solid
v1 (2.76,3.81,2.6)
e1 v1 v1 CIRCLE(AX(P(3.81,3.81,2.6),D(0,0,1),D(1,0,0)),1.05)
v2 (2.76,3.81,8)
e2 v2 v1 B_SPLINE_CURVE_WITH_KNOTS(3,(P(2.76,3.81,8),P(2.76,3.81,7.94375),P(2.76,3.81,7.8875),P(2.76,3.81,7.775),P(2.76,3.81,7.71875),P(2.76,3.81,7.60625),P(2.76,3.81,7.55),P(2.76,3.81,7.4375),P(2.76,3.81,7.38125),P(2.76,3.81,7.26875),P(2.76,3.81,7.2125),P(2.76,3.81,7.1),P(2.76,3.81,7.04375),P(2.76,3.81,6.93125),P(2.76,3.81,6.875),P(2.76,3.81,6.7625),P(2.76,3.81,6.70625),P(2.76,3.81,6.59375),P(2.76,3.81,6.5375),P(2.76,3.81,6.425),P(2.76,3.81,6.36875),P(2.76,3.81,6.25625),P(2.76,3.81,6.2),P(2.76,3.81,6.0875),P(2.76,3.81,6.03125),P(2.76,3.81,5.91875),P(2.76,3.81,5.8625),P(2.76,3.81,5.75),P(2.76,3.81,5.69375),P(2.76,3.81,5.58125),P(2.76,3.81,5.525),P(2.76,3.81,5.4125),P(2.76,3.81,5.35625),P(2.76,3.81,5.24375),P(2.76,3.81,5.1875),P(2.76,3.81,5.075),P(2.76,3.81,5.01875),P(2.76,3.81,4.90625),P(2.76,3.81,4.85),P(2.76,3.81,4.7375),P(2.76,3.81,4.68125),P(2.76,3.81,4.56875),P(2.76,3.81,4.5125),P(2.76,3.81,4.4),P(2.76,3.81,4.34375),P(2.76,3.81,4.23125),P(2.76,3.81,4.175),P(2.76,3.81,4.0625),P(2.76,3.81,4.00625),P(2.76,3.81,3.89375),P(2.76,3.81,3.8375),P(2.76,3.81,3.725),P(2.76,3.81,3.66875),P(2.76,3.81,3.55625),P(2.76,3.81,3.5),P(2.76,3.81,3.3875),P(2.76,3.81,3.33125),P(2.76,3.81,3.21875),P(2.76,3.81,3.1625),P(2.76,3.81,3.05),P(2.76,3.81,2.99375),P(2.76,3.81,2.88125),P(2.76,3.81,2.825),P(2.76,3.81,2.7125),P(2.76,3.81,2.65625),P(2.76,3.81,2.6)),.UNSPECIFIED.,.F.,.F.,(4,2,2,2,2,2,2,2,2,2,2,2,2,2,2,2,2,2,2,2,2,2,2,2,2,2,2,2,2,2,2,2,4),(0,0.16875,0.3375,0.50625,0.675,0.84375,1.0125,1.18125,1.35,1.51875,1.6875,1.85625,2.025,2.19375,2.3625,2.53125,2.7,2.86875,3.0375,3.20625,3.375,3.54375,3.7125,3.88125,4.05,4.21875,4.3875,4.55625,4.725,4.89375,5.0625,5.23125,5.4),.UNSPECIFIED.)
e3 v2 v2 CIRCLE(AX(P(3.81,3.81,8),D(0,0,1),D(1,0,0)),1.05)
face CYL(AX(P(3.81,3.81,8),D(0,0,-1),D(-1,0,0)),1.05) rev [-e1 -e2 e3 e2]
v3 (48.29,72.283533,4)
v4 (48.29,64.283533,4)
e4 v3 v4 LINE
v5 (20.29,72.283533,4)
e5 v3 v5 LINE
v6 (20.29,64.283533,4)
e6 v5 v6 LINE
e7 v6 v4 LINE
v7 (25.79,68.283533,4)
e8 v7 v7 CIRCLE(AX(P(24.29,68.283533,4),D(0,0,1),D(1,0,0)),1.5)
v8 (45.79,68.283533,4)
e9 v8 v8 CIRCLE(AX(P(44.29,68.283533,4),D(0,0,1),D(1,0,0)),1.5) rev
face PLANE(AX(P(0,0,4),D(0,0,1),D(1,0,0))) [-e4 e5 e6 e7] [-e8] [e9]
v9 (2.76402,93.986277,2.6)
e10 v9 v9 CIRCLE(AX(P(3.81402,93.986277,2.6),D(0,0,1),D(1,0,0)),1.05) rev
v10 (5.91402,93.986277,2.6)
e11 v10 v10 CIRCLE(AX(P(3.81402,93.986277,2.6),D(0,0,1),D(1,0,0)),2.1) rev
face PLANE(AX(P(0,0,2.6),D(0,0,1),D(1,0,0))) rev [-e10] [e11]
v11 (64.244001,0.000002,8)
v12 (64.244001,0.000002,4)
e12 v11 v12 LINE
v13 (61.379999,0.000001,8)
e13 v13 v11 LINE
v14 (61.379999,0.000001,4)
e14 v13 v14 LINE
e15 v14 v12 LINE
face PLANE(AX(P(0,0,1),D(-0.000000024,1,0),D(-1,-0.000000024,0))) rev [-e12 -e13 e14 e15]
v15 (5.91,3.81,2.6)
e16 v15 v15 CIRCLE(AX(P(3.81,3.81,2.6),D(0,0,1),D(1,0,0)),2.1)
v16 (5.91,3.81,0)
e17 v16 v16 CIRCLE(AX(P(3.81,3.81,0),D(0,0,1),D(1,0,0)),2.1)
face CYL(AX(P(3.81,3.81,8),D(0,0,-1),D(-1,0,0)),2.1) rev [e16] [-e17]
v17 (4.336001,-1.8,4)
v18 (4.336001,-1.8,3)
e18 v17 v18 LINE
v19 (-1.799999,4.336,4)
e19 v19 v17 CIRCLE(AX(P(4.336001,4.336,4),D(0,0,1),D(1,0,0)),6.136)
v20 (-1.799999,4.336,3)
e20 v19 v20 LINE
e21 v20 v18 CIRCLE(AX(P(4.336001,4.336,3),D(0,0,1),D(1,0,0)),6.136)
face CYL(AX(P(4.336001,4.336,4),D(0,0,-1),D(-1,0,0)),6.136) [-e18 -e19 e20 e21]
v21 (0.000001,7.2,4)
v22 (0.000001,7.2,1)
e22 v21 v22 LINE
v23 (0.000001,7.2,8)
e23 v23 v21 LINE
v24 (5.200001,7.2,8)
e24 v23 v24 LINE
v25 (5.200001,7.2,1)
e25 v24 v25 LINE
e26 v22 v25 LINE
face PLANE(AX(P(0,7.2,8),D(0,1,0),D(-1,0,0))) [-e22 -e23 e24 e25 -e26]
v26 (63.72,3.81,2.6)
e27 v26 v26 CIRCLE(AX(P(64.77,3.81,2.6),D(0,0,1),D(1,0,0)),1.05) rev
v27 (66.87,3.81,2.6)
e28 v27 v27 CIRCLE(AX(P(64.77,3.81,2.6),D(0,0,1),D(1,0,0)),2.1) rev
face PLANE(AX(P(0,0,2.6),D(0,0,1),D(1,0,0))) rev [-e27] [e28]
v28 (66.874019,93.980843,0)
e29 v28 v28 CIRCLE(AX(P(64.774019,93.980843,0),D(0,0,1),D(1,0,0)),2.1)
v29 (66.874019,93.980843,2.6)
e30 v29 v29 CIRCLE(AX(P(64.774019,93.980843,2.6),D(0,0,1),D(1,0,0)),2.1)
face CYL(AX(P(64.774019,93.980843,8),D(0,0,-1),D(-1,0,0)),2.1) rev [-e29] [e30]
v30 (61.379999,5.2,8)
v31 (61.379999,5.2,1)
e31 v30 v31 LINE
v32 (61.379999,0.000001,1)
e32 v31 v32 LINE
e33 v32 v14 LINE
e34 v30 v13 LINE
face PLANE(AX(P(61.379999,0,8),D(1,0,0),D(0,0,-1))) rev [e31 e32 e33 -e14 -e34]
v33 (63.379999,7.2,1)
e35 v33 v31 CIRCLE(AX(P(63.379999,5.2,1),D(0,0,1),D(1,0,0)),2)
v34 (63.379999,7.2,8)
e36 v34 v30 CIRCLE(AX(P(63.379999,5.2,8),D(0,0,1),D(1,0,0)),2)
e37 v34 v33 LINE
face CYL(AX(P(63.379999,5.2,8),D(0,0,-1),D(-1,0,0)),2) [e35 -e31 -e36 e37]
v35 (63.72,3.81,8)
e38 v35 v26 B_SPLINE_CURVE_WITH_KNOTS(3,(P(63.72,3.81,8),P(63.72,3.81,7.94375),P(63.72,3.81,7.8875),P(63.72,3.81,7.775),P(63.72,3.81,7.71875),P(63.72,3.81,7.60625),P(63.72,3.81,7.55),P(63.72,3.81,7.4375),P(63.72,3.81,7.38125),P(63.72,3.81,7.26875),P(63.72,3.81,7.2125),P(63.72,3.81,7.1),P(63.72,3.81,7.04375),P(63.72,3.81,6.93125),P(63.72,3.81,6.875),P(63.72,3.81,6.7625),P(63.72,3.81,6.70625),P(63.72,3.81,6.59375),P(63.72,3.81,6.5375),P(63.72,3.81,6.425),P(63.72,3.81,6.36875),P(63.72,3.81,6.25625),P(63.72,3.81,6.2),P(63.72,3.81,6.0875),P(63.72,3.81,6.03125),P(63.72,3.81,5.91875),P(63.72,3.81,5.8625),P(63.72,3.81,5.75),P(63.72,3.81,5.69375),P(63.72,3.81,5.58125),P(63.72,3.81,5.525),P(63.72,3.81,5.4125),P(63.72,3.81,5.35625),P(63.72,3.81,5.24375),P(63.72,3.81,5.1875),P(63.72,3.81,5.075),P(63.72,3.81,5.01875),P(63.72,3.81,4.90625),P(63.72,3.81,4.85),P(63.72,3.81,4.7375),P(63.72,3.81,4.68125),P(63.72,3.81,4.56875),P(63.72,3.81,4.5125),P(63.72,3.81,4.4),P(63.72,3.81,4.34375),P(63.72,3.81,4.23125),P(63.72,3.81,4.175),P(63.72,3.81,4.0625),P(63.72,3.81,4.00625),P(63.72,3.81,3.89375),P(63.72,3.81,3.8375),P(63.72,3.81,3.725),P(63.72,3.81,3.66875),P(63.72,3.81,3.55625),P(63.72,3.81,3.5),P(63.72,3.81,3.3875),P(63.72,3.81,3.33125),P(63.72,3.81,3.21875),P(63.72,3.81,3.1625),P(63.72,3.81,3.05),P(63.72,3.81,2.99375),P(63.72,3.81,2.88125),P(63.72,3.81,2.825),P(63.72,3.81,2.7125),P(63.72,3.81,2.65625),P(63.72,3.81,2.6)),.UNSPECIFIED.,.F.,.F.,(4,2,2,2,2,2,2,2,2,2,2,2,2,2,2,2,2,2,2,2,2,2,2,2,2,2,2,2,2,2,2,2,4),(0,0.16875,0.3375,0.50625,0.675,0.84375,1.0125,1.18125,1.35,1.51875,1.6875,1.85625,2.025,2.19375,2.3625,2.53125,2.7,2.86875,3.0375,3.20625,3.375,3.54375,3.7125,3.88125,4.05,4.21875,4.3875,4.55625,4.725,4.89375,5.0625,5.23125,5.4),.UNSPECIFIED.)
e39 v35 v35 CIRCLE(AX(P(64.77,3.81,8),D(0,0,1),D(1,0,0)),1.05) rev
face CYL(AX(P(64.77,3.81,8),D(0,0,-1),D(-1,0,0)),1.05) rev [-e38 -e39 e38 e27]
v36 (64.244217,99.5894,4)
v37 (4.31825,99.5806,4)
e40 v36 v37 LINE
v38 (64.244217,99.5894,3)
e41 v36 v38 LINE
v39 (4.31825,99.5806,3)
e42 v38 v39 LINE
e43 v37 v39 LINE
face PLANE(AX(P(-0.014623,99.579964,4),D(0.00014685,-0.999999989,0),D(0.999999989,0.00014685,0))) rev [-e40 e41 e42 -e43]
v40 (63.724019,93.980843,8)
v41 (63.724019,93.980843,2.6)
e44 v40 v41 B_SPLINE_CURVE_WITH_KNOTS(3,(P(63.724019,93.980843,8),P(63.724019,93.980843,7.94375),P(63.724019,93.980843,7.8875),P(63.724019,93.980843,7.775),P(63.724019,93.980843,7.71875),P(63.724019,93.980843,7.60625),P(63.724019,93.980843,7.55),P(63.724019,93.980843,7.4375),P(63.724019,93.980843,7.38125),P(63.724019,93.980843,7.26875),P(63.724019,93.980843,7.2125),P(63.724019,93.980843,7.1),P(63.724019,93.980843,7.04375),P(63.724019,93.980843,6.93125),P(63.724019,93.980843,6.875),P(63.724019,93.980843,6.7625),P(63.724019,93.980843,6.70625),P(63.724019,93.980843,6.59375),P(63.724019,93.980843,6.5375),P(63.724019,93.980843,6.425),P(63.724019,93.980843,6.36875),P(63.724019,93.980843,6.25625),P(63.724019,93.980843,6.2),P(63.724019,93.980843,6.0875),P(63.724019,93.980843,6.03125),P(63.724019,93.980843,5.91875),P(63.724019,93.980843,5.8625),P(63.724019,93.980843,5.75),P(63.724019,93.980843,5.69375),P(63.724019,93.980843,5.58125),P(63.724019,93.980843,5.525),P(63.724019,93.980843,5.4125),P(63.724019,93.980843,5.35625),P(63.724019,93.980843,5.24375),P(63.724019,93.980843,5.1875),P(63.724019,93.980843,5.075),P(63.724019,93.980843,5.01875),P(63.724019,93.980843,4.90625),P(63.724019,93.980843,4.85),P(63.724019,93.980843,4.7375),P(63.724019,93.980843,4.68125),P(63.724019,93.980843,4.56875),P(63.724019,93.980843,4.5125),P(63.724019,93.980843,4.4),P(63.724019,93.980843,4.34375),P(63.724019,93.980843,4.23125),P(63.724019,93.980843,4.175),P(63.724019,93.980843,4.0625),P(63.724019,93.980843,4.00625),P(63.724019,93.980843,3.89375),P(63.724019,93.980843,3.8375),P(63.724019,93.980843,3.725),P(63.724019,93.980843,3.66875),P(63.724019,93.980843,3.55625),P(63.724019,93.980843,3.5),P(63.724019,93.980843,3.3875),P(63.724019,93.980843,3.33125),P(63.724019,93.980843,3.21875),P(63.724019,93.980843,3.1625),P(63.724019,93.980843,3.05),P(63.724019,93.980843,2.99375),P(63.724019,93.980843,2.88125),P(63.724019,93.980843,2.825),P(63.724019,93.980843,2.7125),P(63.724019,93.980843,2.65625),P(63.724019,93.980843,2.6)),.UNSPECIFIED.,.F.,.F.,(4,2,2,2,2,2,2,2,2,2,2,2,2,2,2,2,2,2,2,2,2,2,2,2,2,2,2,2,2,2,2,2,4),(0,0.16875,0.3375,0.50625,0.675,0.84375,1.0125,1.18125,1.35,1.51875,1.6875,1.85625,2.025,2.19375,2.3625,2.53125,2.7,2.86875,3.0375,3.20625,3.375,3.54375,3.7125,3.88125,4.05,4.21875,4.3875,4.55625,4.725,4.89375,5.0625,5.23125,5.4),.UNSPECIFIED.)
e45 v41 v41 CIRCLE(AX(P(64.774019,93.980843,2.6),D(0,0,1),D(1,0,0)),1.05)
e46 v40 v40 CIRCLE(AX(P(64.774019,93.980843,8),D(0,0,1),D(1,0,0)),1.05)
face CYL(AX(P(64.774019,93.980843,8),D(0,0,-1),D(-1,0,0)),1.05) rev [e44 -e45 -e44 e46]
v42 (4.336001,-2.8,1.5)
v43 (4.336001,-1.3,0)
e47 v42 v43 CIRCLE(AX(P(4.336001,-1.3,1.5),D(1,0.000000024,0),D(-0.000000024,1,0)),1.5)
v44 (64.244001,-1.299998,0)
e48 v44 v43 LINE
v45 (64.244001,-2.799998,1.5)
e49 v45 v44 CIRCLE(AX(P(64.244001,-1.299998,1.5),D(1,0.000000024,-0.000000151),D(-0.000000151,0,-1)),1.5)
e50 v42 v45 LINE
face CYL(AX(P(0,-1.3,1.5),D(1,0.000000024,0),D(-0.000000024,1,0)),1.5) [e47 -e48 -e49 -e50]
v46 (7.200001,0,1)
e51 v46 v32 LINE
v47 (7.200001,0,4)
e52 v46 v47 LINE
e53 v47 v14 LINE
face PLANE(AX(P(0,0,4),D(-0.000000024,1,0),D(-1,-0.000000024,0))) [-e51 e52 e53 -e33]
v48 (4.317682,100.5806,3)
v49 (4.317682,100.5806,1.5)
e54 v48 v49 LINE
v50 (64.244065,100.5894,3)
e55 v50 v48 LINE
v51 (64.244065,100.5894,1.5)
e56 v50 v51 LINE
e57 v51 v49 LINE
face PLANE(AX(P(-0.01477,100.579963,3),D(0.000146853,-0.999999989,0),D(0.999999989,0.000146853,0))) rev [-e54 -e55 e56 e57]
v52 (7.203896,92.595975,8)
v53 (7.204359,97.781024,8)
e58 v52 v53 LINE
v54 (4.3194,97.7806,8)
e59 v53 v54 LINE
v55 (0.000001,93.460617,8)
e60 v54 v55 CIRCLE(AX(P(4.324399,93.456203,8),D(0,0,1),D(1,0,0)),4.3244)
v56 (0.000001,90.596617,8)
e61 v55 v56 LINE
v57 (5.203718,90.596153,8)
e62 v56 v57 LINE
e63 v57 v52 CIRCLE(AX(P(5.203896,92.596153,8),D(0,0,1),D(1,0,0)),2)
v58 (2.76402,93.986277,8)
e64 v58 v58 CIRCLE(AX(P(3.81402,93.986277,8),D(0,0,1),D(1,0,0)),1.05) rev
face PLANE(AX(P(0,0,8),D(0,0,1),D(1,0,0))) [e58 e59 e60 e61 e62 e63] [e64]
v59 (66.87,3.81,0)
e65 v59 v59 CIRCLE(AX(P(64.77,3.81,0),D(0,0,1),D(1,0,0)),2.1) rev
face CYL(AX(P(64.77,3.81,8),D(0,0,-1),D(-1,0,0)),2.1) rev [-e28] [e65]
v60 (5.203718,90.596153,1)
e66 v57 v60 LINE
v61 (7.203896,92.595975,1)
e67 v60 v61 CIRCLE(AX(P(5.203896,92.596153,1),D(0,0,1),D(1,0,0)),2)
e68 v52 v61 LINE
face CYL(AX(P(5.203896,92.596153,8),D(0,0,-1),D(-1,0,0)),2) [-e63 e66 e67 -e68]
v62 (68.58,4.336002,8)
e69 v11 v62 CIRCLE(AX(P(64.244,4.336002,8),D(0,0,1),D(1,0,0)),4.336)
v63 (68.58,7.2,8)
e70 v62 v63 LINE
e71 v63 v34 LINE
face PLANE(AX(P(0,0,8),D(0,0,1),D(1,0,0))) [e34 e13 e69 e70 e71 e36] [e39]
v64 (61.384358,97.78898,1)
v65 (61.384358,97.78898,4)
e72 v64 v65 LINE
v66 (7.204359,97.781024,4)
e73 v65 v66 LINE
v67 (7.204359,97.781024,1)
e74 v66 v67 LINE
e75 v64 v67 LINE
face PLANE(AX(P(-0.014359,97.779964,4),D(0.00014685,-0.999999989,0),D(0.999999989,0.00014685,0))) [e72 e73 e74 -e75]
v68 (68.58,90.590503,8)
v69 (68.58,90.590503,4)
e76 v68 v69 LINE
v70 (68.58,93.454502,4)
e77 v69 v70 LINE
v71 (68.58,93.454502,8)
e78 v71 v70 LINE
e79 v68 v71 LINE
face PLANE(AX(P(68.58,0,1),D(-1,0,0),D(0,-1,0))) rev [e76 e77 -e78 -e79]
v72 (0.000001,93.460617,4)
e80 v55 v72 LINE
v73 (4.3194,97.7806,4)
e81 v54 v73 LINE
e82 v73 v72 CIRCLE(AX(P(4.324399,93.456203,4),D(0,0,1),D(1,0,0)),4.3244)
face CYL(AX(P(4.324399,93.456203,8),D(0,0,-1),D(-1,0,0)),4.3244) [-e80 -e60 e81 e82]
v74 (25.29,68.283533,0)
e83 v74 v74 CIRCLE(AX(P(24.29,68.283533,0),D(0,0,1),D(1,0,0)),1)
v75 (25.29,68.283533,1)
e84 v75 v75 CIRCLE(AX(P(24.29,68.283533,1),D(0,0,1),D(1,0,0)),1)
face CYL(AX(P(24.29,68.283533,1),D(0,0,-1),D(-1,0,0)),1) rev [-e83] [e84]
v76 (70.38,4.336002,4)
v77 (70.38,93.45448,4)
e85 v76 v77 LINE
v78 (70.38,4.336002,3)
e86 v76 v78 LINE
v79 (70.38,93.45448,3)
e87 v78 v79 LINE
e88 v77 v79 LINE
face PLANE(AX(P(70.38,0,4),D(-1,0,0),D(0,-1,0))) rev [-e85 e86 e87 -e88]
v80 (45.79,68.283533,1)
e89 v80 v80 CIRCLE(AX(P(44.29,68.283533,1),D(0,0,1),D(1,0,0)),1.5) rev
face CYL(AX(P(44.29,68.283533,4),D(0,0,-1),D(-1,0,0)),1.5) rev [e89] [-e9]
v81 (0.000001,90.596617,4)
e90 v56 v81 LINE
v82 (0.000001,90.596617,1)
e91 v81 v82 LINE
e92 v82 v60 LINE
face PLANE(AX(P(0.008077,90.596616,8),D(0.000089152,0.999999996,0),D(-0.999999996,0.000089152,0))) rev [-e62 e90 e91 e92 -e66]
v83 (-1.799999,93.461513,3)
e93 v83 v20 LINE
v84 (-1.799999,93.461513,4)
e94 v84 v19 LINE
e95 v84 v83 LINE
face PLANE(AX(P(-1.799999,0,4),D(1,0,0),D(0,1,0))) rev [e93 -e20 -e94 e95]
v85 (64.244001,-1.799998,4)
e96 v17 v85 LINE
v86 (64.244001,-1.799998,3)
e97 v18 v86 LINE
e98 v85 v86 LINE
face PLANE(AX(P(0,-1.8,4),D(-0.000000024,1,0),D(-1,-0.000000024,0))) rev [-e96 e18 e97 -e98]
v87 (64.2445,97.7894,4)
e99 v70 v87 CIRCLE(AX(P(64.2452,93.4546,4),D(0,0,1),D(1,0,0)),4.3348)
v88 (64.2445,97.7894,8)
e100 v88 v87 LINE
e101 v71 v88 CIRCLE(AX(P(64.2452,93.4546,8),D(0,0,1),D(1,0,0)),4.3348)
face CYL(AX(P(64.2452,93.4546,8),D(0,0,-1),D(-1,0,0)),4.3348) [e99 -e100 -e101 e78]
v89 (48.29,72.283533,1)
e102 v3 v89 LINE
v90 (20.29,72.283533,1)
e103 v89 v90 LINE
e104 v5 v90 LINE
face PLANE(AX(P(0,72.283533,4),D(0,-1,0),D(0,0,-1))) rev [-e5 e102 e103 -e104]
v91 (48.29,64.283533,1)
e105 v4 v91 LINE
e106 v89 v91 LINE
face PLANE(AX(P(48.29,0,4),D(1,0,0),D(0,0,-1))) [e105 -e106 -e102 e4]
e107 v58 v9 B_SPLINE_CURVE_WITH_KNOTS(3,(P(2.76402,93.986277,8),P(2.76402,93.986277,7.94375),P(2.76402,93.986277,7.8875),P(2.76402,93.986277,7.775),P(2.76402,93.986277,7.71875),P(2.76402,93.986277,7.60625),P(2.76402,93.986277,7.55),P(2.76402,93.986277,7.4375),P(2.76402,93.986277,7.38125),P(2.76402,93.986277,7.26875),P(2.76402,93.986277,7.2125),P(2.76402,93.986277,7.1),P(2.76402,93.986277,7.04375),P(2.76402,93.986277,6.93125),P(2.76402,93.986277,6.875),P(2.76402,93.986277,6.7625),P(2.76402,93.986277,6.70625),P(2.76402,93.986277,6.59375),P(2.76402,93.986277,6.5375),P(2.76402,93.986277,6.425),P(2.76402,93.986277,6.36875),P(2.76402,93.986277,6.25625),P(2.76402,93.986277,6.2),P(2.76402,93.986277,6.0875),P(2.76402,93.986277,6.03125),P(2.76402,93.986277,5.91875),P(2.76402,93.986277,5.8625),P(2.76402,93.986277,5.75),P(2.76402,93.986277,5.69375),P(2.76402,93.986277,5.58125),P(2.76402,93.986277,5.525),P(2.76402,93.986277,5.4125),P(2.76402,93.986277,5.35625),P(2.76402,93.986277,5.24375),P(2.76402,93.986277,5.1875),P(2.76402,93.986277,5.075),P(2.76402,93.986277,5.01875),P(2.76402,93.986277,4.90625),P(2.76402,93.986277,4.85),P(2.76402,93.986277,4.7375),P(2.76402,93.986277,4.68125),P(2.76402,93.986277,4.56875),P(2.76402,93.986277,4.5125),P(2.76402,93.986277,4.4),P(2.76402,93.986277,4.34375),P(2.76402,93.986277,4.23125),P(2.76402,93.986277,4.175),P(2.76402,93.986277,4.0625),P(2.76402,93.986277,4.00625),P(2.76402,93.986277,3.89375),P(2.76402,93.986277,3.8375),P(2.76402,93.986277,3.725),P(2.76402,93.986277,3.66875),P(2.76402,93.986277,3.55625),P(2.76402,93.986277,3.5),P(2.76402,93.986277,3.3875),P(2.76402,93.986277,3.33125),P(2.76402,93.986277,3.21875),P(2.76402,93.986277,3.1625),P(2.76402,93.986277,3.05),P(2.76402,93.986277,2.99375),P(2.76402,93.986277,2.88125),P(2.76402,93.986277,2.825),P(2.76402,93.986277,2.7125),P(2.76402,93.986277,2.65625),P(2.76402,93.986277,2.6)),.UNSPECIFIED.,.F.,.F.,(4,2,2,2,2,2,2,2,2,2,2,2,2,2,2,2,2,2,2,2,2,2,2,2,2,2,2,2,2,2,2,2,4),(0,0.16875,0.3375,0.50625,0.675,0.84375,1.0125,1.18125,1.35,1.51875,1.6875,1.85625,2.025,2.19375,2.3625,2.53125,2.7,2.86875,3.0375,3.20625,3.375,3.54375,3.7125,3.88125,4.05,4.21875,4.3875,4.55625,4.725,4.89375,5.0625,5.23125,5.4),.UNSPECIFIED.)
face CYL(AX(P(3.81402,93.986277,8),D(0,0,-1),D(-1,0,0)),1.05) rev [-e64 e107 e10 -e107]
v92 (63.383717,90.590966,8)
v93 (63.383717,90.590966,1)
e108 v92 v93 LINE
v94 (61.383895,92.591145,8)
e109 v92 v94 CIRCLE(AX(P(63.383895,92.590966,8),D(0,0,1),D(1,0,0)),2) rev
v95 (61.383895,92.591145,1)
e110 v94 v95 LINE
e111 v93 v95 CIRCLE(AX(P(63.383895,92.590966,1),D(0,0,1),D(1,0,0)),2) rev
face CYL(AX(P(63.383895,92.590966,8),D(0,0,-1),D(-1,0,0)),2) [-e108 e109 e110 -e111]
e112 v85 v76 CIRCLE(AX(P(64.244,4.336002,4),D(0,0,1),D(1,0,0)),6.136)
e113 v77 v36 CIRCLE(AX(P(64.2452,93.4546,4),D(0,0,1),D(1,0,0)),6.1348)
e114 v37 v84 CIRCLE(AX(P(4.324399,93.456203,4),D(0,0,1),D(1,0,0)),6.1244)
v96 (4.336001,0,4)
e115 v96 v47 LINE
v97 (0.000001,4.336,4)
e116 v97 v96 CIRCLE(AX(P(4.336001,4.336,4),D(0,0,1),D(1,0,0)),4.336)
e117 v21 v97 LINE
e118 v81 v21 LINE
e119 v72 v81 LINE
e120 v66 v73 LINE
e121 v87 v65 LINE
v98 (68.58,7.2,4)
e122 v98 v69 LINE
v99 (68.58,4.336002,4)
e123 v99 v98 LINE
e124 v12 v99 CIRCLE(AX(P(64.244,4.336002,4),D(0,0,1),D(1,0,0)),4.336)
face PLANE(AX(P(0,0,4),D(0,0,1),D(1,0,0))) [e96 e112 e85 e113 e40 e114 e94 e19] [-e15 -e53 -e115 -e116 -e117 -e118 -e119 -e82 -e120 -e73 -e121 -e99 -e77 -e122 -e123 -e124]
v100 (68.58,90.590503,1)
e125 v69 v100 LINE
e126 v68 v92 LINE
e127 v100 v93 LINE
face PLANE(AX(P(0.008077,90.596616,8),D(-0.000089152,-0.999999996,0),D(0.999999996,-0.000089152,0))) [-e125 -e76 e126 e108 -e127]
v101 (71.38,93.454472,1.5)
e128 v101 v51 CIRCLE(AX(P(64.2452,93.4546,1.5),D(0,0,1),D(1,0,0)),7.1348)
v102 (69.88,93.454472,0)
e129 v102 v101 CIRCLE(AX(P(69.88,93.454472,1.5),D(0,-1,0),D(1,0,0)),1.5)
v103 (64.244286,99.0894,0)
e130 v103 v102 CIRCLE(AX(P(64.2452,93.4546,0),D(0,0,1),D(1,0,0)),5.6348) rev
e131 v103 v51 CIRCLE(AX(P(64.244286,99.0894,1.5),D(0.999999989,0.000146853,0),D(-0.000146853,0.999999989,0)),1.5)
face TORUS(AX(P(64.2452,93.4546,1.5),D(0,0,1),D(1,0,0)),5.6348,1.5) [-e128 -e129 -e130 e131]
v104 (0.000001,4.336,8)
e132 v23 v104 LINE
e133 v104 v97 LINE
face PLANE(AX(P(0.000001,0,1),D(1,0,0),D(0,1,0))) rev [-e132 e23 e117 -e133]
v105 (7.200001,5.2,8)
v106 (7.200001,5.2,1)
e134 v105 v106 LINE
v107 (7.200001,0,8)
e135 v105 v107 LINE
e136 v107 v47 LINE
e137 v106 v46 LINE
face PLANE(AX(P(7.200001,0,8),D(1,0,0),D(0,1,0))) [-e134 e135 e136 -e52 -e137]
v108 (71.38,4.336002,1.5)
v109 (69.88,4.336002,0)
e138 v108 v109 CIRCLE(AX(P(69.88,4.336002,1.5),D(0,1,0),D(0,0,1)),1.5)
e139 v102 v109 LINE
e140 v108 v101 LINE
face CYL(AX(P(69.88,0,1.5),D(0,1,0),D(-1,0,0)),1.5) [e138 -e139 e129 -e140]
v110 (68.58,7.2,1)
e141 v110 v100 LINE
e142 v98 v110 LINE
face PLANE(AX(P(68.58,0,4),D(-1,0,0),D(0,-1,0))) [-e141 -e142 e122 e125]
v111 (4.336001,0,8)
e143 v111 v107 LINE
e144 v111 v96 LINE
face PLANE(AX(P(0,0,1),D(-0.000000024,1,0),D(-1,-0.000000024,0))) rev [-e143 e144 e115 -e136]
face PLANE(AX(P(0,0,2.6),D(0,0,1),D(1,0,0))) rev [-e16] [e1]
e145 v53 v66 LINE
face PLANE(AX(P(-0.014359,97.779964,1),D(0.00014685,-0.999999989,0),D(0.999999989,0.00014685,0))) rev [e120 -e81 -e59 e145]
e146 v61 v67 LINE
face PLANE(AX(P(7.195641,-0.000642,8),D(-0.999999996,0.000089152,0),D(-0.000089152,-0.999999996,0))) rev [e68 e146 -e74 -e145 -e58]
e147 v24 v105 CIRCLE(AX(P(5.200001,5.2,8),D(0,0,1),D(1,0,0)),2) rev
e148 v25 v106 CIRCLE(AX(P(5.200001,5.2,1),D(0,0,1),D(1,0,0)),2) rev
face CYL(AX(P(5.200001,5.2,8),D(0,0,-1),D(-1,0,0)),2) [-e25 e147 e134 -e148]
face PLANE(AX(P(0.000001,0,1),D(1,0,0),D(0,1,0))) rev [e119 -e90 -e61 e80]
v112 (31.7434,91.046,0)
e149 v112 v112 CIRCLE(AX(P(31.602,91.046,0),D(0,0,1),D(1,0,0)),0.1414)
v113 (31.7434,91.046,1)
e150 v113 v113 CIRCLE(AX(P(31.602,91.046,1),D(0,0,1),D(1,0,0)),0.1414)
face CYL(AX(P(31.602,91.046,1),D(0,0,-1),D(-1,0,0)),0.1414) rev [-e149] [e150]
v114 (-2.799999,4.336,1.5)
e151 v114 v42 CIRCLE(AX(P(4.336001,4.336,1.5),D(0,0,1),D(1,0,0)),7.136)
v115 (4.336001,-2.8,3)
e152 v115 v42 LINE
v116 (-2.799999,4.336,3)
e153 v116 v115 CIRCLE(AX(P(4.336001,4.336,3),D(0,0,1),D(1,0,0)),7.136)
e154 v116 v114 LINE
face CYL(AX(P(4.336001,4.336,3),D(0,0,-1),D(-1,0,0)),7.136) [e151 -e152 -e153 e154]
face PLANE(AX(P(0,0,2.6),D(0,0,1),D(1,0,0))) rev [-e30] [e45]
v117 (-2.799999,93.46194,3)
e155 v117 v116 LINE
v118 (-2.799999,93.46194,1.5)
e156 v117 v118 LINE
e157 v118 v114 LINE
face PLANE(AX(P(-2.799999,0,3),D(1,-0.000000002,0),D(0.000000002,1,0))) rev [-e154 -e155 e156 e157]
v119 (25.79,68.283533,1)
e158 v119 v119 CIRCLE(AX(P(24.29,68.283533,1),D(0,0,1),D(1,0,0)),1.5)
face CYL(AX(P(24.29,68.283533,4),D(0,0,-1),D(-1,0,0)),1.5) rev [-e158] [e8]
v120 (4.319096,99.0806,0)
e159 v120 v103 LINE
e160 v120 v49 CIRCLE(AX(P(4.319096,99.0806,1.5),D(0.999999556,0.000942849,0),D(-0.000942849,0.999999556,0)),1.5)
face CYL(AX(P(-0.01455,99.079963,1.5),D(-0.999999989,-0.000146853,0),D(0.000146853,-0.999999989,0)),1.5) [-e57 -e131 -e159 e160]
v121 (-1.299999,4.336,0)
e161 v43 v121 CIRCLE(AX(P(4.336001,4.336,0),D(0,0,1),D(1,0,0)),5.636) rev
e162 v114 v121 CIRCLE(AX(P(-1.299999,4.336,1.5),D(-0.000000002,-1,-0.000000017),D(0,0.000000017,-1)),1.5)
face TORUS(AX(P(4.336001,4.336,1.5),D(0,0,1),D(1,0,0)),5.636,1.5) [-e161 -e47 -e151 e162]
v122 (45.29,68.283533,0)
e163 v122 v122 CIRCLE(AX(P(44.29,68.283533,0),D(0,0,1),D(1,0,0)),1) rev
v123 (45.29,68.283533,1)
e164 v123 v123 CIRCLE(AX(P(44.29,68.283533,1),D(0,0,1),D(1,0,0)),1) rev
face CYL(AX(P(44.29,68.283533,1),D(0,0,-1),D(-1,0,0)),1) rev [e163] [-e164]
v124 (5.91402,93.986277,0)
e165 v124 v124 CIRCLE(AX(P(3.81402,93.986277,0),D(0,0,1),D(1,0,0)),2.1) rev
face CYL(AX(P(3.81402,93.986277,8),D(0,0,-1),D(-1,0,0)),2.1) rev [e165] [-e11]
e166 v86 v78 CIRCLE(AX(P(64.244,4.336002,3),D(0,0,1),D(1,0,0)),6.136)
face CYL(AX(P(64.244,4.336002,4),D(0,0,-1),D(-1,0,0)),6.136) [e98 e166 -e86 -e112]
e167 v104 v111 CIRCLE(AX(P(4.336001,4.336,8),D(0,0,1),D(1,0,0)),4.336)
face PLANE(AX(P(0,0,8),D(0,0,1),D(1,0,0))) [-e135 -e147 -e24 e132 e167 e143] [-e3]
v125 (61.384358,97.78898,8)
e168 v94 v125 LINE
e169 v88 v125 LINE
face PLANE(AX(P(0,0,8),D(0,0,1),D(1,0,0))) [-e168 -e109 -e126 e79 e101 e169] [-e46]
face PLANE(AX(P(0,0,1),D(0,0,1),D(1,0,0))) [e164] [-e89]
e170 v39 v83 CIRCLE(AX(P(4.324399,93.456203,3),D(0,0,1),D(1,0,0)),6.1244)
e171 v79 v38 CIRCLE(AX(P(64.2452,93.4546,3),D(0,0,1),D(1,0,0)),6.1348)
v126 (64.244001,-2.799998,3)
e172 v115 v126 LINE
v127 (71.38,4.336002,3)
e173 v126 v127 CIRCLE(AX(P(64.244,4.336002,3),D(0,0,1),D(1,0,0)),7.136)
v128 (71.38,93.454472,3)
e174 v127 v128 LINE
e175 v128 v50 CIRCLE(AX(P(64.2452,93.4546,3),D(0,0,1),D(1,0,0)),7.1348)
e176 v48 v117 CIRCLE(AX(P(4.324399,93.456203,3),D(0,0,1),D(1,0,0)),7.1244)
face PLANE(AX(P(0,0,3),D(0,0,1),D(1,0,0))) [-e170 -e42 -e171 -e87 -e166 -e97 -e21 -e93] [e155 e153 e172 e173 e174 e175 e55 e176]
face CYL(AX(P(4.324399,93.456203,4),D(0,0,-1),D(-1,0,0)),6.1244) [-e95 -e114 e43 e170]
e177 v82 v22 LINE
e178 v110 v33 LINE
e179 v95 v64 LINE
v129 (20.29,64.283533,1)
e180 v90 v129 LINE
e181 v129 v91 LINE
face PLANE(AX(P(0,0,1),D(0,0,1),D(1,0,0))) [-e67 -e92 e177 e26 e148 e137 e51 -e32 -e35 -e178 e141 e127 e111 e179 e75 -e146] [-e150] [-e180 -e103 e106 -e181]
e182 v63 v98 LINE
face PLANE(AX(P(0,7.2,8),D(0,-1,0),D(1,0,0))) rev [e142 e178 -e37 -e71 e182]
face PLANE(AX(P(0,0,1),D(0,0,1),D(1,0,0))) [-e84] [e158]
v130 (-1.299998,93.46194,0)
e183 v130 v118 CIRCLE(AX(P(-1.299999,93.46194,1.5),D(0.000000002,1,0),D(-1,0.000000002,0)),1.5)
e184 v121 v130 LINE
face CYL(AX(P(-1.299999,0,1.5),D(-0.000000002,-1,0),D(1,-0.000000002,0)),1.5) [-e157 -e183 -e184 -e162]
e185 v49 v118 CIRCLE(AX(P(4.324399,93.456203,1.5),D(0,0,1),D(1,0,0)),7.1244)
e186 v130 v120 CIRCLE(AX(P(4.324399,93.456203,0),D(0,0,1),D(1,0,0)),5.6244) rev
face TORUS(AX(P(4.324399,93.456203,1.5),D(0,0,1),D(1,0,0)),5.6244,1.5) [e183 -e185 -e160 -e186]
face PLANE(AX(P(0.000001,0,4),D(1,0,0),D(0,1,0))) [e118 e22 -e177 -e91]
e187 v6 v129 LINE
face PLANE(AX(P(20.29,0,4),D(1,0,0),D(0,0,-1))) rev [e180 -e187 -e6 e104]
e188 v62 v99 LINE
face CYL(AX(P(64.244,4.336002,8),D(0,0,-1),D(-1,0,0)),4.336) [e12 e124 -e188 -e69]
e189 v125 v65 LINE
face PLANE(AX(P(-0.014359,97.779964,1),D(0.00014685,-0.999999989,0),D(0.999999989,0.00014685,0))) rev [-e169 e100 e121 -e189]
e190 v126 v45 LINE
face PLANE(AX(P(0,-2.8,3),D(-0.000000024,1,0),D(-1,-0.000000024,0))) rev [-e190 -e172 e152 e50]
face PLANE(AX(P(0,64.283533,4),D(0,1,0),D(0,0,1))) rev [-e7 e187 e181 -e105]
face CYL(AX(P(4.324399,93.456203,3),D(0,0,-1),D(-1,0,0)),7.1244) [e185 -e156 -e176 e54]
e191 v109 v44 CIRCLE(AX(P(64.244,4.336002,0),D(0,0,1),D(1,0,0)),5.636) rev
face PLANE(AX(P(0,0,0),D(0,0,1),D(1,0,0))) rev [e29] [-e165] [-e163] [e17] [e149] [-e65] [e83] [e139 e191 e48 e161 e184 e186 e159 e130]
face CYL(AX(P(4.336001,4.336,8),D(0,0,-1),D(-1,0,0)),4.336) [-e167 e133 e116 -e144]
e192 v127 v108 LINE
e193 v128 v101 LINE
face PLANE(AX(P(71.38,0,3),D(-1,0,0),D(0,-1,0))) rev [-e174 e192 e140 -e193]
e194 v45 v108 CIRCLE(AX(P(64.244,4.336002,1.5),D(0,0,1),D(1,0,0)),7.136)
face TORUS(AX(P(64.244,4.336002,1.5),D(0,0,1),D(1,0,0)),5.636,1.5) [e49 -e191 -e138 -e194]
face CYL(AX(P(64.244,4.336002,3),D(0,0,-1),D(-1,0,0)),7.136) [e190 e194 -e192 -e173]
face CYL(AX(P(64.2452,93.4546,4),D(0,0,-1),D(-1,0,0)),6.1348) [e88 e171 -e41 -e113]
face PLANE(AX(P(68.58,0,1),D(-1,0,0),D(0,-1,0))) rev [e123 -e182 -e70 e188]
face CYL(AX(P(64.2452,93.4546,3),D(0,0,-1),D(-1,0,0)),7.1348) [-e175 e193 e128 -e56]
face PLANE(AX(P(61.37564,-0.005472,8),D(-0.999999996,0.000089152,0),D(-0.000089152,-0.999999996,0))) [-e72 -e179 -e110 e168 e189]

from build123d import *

# Parameters (mm, degrees)
SKIZZE1_R                         = 0.1414
SKIZZE1_W                         = 28
SKIZZE1_H                         = 8
AUFSATZ_LINEAR_AUSTRAGEN1_DEPTH   = 1
SKIZZE1_4_R                       = 1.5
SKIZZE1_4_R_2                     = 1
AUFSATZ_LINEAR_AUSTRAGEN3_DEPTH   = 1
AUFSATZ_LINEAR_AUSTRAGEN3_2_DEPTH = 1
SKIZZE1_5_W                       = 28
SKIZZE1_5_H                       = 8
SKIZZE1_5_R                       = 1.5
AUFSATZ_LINEAR_AUSTRAGEN4_DEPTH   = 4
AUFSATZ_LINEAR_AUSTRAGEN6_DEPTH   = 1
AUFSATZ_LINEAR_START              = 2.6
SKIZZE1_8_R                       = 2.1
SKIZZE1_8_R_2                     = 1.8596
SKIZZE1_8_R_3                     = 1.05
AUFSATZ_LINEAR_AUSTRAGEN7_DEPTH   = 5.4
SKIZZE1_9_R                       = 2.1
AUFSATZ_LINEAR_AUSTRAGEN8_DEPTH   = 8
AUFSATZ_LINEAR_AUSTRAGEN10_DEPTH  = 4
AUFSATZ_LINEAR_AUSTRAGEN11_DEPTH  = 3
VERRUNDUNG2_R                     = 1.5


# Read off the part's stored shape, not the designer's step: Aufsatz-Linear austragen10, Aufsatz-Linear austragen11
with BuildPart() as part:
    # Skizze1 → Aufsatz-Linear austragen1 (new body)
    with BuildSketch(Plane.XY):
        with BuildLine():
            Line((61.383894873, 92.591144656), (61.384358272, 97.788979988))
            Line((61.384358272, 97.788979988), (7.204358721, 97.781023656))
            Line((7.204358721, 97.781023656), (7.203896462, 92.595974926))
            ThreePointArc((7.203896462, 92.595974926), (6.617983946, 91.181813594), (5.203718166, 90.596153239))
            Line((5.203718166, 90.596153239), (1.077e-06, 90.596617162))
            Line((1.077e-06, 90.596617162), (1.077e-06, 7.200000174))
            Line((1.077e-06, 7.200000174), (5.200000687, 7.200000174))
            ThreePointArc((5.200000687, 7.200000174), (6.614214249, 6.614213736), (7.200000687, 5.200000174))
            Line((7.200000687, 5.200000174), (7.200000687, 1.74e-07))
            Line((7.200000687, 1.74e-07), (61.379999313, 1.484e-06))
            Line((61.379999313, 1.484e-06), (61.379999313, 5.200000174))
            ThreePointArc((61.379999313, 5.200000174), (61.965785751, 6.614213736), (63.379999313, 7.200000174))
            Line((63.379999313, 7.200000174), (68.58, 7.200000174))
            Line((68.58, 7.200000174), (68.58, 90.590503098))
            Line((68.58, 90.590503098), (63.383716561, 90.590966359))
            ThreePointArc((63.383716561, 90.590966359), (61.969555228, 91.176878875), (61.383894873, 92.591144656))
        make_face()
        with Locations((31.602, 91.046)):
            Circle(SKIZZE1_R, mode=Mode.SUBTRACT)
        Polygon((32.79, 91.48), (31.79, 91.48), (31.79, 92.48), align=None, mode=Mode.SUBTRACT)
        with Locations((34.29, 68.283532534)):
            Rectangle(SKIZZE1_W, SKIZZE1_H, mode=Mode.SUBTRACT)
    extrude(amount=AUFSATZ_LINEAR_AUSTRAGEN1_DEPTH)



with BuildPart() as body_2:
    # Skizze1<4> → Aufsatz-Linear austragen3 (new body)
    with BuildSketch(Plane.XY):
        with Locations((44.29, 68.283532534)):
            Circle(SKIZZE1_4_R)
        with Locations((44.29, 68.283532534)):
            Circle(SKIZZE1_4_R_2, mode=Mode.SUBTRACT)
    extrude(amount=AUFSATZ_LINEAR_AUSTRAGEN3_DEPTH)


with BuildPart() as body_3:
    # Skizze1<4> → Aufsatz-Linear austragen3 2 (new body)
    with BuildSketch(Plane.XY):
        with Locations((24.29, 68.283532534)):
            Circle(SKIZZE1_4_R)
        with Locations((24.29, 68.283532534)):
            Circle(SKIZZE1_4_R_2, mode=Mode.SUBTRACT)
    extrude(amount=AUFSATZ_LINEAR_AUSTRAGEN3_2_DEPTH)


with BuildPart() as part_1:
    add(part.part)

    add(body_2.part)  # Aufsatz-Linear austragen4 merges body 2

    add(body_3.part)  # Aufsatz-Linear austragen4 merges body 3
    # Skizze1<5> → Aufsatz-Linear austragen4 (add)
    with BuildSketch(Plane.XY):
        with Locations((34.29, 68.283532534)):
            Rectangle(SKIZZE1_5_W, SKIZZE1_5_H)
        with Locations((24.29, 68.283532534)):
            Circle(SKIZZE1_5_R, mode=Mode.SUBTRACT)
        with Locations((44.29, 68.283532534)):
            Circle(SKIZZE1_5_R, mode=Mode.SUBTRACT)
    extrude(amount=AUFSATZ_LINEAR_AUSTRAGEN4_DEPTH)

    # Skizze1<7> → Aufsatz-Linear austragen6 (add)
    with BuildSketch(Plane.XY):
        Polygon((31.79, 92.48), (32.79, 91.48), (31.79, 91.48), align=None)
    extrude(amount=AUFSATZ_LINEAR_AUSTRAGEN6_DEPTH)



with BuildPart() as body_2_2:
    # Skizze1<8> → Aufsatz-Linear austragen7 (new body)
    # profile 1 of 8: a face of its own
    with BuildSketch(Plane.XY.offset(AUFSATZ_LINEAR_START)):
        with Locations(Location((3.814019711, 93.986277321, 0), (0, 0, 180))):
            Circle(SKIZZE1_8_R)
        with Locations((3.81, 93.98)):
            Circle(SKIZZE1_8_R_2, mode=Mode.SUBTRACT)
    # profile 2 of 8: a face of its own
    with BuildSketch(Plane.XY.offset(AUFSATZ_LINEAR_START)):
        with Locations((3.81, 93.98)):
            Circle(SKIZZE1_8_R_2)
        with Locations(Location((3.814019711, 93.986277321, 0), (0, 0, 180))):
            Circle(SKIZZE1_8_R_3, mode=Mode.SUBTRACT)
    # profile 3 of 8: a face of its own
    with BuildSketch(Plane.XY.offset(AUFSATZ_LINEAR_START)):
        with Locations(Location((64.774019468, 93.980842598, 0), (0, 0, 180))):
            Circle(SKIZZE1_8_R)
        with Locations((64.77, 93.98)):
            Circle(SKIZZE1_8_R_2, mode=Mode.SUBTRACT)
    # profile 4 of 8: a face of its own
    with BuildSketch(Plane.XY.offset(AUFSATZ_LINEAR_START)):
        with Locations((64.77, 93.98)):
            Circle(SKIZZE1_8_R_2)
        with Locations(Location((64.774019468, 93.980842598, 0), (0, 0, 180))):
            Circle(SKIZZE1_8_R_3, mode=Mode.SUBTRACT)
    # profile 5 of 8: a face of its own
    with BuildSketch(Plane.XY.offset(AUFSATZ_LINEAR_START)):
        with Locations(Location((64.77, 3.81, 0), (0, 0, 180))):
            Circle(SKIZZE1_8_R)
        with Locations((64.77, 3.81)):
            Circle(SKIZZE1_8_R_2, mode=Mode.SUBTRACT)
    # profile 6 of 8: a face of its own
    with BuildSketch(Plane.XY.offset(AUFSATZ_LINEAR_START)):
        with Locations((64.77, 3.81)):
            Circle(SKIZZE1_8_R_2)
        with Locations(Location((64.77, 3.81, 0), (0, 0, 180))):
            Circle(SKIZZE1_8_R_3, mode=Mode.SUBTRACT)
    # profile 7 of 8: a face of its own
    with BuildSketch(Plane.XY.offset(AUFSATZ_LINEAR_START)):
        with Locations(Location((3.81, 3.81, 0), (0, 0, 180))):
            Circle(SKIZZE1_8_R)
        with Locations((3.81, 3.81)):
            Circle(SKIZZE1_8_R_2, mode=Mode.SUBTRACT)
    # profile 8 of 8: a face of its own
    with BuildSketch(Plane.XY.offset(AUFSATZ_LINEAR_START)):
        with Locations((3.81, 3.81)):
            Circle(SKIZZE1_8_R_2)
        with Locations(Location((3.81, 3.81, 0), (0, 0, 180))):
            Circle(SKIZZE1_8_R_3, mode=Mode.SUBTRACT)
    extrude(amount=AUFSATZ_LINEAR_AUSTRAGEN7_DEPTH)


with BuildPart() as part_2:
    add(part_1.part)

    add(body_2_2.part)  # Aufsatz-Linear austragen8 merges body 2 2
    # Skizze1<9> → Aufsatz-Linear austragen8 (add)
    # profile 1 of 6: a face of its own
    with BuildSketch(Plane.XY):
        with BuildLine():
            Line((2.8575, 7.200000174), (1.077e-06, 7.200000174))
            Line((1.077e-06, 7.200000174), (1.077e-06, 4.336))
            ThreePointArc((1.077e-06, 4.336), (1.269986148, 1.269985027), (4.336001182, 1.05e-07))
            Line((4.336001182, 1.05e-07), (7.200000687, 1.74e-07))
            Line((7.200000687, 1.74e-07), (7.200000687, 5.200000174))
            ThreePointArc((7.200000687, 5.200000174), (7.106910999, 5.803069872), (6.836307626, 6.35))
            Line((6.836307626, 6.35), (2.8575, 6.35))
            Line((2.8575, 6.35), (2.8575, 7.200000174))
        make_face()
        with Locations((3.81, 3.81)):
            Circle(SKIZZE1_9_R, mode=Mode.SUBTRACT)
    # profile 2 of 6: a face of its own
    with BuildSketch(Plane.XY):
        with BuildLine():
            Line((5.200000687, 7.200000174), (2.8575, 7.200000174))
            Line((2.8575, 7.200000174), (2.8575, 6.35))
            Line((2.8575, 6.35), (6.836307626, 6.35))
            ThreePointArc((6.836307626, 6.35), (6.121955227, 6.97482406), (5.200000687, 7.200000174))
        make_face()
    # profile 3 of 6: a face of its own
    with BuildSketch(Plane.XY):
        with BuildLine():
            Line((65.6575, 6.35), (65.6575, 7.200000174))
            Line((65.6575, 7.200000174), (63.379999313, 7.200000174))
            ThreePointArc((63.379999313, 7.200000174), (62.458044773, 6.97482406), (61.743692374, 6.35))
            Line((61.743692374, 6.35), (65.6575, 6.35))
        make_face()
    # profile 4 of 6: a face of its own
    with BuildSketch(Plane.XY):
        with BuildLine():
            Line((68.58, 4.336001553), (68.58, 7.200000174))
            Line((68.58, 7.200000174), (65.6575, 7.200000174))
            Line((65.6575, 7.200000174), (65.6575, 6.35))
            Line((65.6575, 6.35), (61.743692374, 6.35))
            ThreePointArc((61.743692374, 6.35), (61.473089001, 5.803069872), (61.379999313, 5.200000174))
            Line((61.379999313, 5.200000174), (61.379999313, 1.484e-06))
            Line((61.379999313, 1.484e-06), (64.244001182, 1.553e-06))
            ThreePointArc((64.244001182, 1.553e-06), (67.310015421, 1.269986968), (68.58, 4.336001553))
        make_face()
        with Locations((64.77, 3.81)):
            Circle(SKIZZE1_9_R, mode=Mode.SUBTRACT)
    # profile 5 of 6: a face of its own
    with BuildSketch(Plane.XY):
        with BuildLine():
            ThreePointArc((68.58, 93.454501553), (67.310153807, 96.519979186), (64.2445, 97.7894))
            Line((64.2445, 97.7894), (61.384358272, 97.788979988))
            Line((61.384358272, 97.788979988), (61.383894873, 92.591144656))
            ThreePointArc((61.383894873, 92.591144656), (61.969555228, 91.176878875), (63.383716561, 90.590966359))
            Line((63.383716561, 90.590966359), (68.58, 90.590503098))
            Line((68.58, 90.590503098), (68.58, 93.454501553))
        make_face()
        with Locations((64.774019468, 93.980842598)):
            Circle(SKIZZE1_9_R, mode=Mode.SUBTRACT)
    # profile 6 of 6: a face of its own
    with BuildSketch(Plane.XY):
        with BuildLine():
            Line((7.203896462, 92.595974926), (7.204358721, 97.781023656))
            Line((7.204358721, 97.781023656), (4.3194, 97.7806))
            ThreePointArc((4.3194, 97.7806), (1.266379599, 96.513808779), (1.077e-06, 93.46061717))
            Line((1.077e-06, 93.46061717), (1.077e-06, 90.596617162))
            Line((1.077e-06, 90.596617162), (5.203718166, 90.596153239))
            ThreePointArc((5.203718166, 90.596153239), (6.617983946, 91.181813594), (7.203896462, 92.595974926))
        make_face()
        with Locations((3.814019711, 93.986277321)):
            Circle(SKIZZE1_9_R, mode=Mode.SUBTRACT)
    extrude(amount=AUFSATZ_LINEAR_AUSTRAGEN8_DEPTH)

    # Aufsatz-Linear austragen10 outline → Aufsatz-Linear austragen10 (add)
    with BuildSketch(Plane.XY):
        with BuildLine():
            Line((-1.799998934, 93.461512972), (-1.799998923, 4.336))
            ThreePointArc((-1.799998923, 4.336), (-0.002806042, -0.002807194), (4.336001226, -1.799999895))
            Line((4.336001226, -1.799999895), (64.244001226, -1.799998447))
            ThreePointArc((64.244001226, -1.799998447), (68.582807643, -0.002805223), (70.38, 4.336001553))
            Line((70.38, 4.336001553), (70.38, 93.454479711))
            ThreePointArc((70.38, 93.454479711), (68.58285381, 97.792863588), (64.244217377, 99.589399978))
            Line((64.244217377, 99.589399978), (4.318250116, 99.580599863))
            ThreePointArc((4.318250116, 99.580599863), (-0.006502478, 97.786511193), (-1.799998934, 93.461512972))
        make_face()
        with BuildLine():
            Line((68.58, 93.454501553), (68.58, 4.336001553))
            ThreePointArc((68.58, 4.336001553), (67.310015421, 1.269986968), (64.244001182, 1.553e-06))
            Line((64.244001182, 1.553e-06), (61.379999313, 1.484e-06))
            Line((61.379999313, 1.484e-06), (7.200000687, 1.74e-07))
            Line((7.200000687, 1.74e-07), (4.336001182, 1.05e-07))
            ThreePointArc((4.336001182, 1.05e-07), (1.269986148, 1.269985027), (1.077e-06, 4.336))
            Line((1.077e-06, 4.336), (1.077e-06, 93.46061717))
            ThreePointArc((1.077e-06, 93.46061717), (1.266379599, 96.513808779), (4.3194, 97.7806))
            Line((4.3194, 97.7806), (7.204358721, 97.781023656))
            Line((7.204358721, 97.781023656), (61.384358272, 97.788979988))
            Line((61.384358272, 97.788979988), (64.2445, 97.7894))
            ThreePointArc((64.2445, 97.7894), (67.310153807, 96.519979186), (68.58, 93.454501553))
        make_face(mode=Mode.SUBTRACT)
    extrude(amount=AUFSATZ_LINEAR_AUSTRAGEN10_DEPTH)

    # Aufsatz-Linear austragen11 outline → Aufsatz-Linear austragen11 (add)
    with BuildSketch(Plane.XY):
        with BuildLine():
            ThreePointArc((-2.799998923, 4.336), (-0.709912815, -0.709913984), (4.33600125, -2.799999895))
            Line((4.33600125, -2.799999895), (64.24400125, -2.799998447))
            ThreePointArc((64.24400125, -2.799998447), (69.289914432, -0.709911996), (71.38, 4.336001553))
            Line((71.38, 4.336001553), (71.38, 93.454472112))
            ThreePointArc((71.38, 93.454472112), (69.289909532, 98.500021425), (64.244065367, 100.589399966))
            Line((64.244065367, 100.589399966), (4.317681591, 100.580599611))
            ThreePointArc((4.317681591, 100.580599611), (-0.71365933, 98.493567657), (-2.799998754, 93.461939525))
            Line((-2.799998754, 93.461939525), (-2.799998923, 4.336))
        make_face()
        with BuildLine():
            ThreePointArc((4.336001226, -1.799999895), (-0.002806042, -0.002807194), (-1.799998923, 4.336))
            Line((-1.799998923, 4.336), (-1.799998934, 93.461512972))
            ThreePointArc((-1.799998934, 93.461512972), (-0.006502478, 97.786511193), (4.318250116, 99.580599863))
            Line((4.318250116, 99.580599863), (64.244217377, 99.589399978))
            ThreePointArc((64.244217377, 99.589399978), (68.58285381, 97.792863588), (70.38, 93.454479711))
            Line((70.38, 93.454479711), (70.38, 4.336001553))
            ThreePointArc((70.38, 4.336001553), (68.582807643, -0.002805223), (64.244001226, -1.799998447))
            Line((64.244001226, -1.799998447), (4.336001226, -1.799999895))
        make_face(mode=Mode.SUBTRACT)
    extrude(amount=AUFSATZ_LINEAR_AUSTRAGEN11_DEPTH)

    # Verrundung2
    verrundung2_edges = [part_2.edges().sort_by_distance(p)[0] for p in [
        (-0.709912815, -0.709913984, 0),
        (34.29000125, -2.799999171, 0),
        (69.289914432, -0.709911996, 0),
        (71.38, 48.895236833, 0),
        (69.289909532, 98.500021425, 0),
        (34.280873479, 100.584999788, 0),
        (-0.71365933, 98.493567657, 0),
        (-2.799998839, 48.898969763, 0),
    ]]
    fillet(verrundung2_edges, radius=VERRUNDUNG2_R)


solid = part_2.part
